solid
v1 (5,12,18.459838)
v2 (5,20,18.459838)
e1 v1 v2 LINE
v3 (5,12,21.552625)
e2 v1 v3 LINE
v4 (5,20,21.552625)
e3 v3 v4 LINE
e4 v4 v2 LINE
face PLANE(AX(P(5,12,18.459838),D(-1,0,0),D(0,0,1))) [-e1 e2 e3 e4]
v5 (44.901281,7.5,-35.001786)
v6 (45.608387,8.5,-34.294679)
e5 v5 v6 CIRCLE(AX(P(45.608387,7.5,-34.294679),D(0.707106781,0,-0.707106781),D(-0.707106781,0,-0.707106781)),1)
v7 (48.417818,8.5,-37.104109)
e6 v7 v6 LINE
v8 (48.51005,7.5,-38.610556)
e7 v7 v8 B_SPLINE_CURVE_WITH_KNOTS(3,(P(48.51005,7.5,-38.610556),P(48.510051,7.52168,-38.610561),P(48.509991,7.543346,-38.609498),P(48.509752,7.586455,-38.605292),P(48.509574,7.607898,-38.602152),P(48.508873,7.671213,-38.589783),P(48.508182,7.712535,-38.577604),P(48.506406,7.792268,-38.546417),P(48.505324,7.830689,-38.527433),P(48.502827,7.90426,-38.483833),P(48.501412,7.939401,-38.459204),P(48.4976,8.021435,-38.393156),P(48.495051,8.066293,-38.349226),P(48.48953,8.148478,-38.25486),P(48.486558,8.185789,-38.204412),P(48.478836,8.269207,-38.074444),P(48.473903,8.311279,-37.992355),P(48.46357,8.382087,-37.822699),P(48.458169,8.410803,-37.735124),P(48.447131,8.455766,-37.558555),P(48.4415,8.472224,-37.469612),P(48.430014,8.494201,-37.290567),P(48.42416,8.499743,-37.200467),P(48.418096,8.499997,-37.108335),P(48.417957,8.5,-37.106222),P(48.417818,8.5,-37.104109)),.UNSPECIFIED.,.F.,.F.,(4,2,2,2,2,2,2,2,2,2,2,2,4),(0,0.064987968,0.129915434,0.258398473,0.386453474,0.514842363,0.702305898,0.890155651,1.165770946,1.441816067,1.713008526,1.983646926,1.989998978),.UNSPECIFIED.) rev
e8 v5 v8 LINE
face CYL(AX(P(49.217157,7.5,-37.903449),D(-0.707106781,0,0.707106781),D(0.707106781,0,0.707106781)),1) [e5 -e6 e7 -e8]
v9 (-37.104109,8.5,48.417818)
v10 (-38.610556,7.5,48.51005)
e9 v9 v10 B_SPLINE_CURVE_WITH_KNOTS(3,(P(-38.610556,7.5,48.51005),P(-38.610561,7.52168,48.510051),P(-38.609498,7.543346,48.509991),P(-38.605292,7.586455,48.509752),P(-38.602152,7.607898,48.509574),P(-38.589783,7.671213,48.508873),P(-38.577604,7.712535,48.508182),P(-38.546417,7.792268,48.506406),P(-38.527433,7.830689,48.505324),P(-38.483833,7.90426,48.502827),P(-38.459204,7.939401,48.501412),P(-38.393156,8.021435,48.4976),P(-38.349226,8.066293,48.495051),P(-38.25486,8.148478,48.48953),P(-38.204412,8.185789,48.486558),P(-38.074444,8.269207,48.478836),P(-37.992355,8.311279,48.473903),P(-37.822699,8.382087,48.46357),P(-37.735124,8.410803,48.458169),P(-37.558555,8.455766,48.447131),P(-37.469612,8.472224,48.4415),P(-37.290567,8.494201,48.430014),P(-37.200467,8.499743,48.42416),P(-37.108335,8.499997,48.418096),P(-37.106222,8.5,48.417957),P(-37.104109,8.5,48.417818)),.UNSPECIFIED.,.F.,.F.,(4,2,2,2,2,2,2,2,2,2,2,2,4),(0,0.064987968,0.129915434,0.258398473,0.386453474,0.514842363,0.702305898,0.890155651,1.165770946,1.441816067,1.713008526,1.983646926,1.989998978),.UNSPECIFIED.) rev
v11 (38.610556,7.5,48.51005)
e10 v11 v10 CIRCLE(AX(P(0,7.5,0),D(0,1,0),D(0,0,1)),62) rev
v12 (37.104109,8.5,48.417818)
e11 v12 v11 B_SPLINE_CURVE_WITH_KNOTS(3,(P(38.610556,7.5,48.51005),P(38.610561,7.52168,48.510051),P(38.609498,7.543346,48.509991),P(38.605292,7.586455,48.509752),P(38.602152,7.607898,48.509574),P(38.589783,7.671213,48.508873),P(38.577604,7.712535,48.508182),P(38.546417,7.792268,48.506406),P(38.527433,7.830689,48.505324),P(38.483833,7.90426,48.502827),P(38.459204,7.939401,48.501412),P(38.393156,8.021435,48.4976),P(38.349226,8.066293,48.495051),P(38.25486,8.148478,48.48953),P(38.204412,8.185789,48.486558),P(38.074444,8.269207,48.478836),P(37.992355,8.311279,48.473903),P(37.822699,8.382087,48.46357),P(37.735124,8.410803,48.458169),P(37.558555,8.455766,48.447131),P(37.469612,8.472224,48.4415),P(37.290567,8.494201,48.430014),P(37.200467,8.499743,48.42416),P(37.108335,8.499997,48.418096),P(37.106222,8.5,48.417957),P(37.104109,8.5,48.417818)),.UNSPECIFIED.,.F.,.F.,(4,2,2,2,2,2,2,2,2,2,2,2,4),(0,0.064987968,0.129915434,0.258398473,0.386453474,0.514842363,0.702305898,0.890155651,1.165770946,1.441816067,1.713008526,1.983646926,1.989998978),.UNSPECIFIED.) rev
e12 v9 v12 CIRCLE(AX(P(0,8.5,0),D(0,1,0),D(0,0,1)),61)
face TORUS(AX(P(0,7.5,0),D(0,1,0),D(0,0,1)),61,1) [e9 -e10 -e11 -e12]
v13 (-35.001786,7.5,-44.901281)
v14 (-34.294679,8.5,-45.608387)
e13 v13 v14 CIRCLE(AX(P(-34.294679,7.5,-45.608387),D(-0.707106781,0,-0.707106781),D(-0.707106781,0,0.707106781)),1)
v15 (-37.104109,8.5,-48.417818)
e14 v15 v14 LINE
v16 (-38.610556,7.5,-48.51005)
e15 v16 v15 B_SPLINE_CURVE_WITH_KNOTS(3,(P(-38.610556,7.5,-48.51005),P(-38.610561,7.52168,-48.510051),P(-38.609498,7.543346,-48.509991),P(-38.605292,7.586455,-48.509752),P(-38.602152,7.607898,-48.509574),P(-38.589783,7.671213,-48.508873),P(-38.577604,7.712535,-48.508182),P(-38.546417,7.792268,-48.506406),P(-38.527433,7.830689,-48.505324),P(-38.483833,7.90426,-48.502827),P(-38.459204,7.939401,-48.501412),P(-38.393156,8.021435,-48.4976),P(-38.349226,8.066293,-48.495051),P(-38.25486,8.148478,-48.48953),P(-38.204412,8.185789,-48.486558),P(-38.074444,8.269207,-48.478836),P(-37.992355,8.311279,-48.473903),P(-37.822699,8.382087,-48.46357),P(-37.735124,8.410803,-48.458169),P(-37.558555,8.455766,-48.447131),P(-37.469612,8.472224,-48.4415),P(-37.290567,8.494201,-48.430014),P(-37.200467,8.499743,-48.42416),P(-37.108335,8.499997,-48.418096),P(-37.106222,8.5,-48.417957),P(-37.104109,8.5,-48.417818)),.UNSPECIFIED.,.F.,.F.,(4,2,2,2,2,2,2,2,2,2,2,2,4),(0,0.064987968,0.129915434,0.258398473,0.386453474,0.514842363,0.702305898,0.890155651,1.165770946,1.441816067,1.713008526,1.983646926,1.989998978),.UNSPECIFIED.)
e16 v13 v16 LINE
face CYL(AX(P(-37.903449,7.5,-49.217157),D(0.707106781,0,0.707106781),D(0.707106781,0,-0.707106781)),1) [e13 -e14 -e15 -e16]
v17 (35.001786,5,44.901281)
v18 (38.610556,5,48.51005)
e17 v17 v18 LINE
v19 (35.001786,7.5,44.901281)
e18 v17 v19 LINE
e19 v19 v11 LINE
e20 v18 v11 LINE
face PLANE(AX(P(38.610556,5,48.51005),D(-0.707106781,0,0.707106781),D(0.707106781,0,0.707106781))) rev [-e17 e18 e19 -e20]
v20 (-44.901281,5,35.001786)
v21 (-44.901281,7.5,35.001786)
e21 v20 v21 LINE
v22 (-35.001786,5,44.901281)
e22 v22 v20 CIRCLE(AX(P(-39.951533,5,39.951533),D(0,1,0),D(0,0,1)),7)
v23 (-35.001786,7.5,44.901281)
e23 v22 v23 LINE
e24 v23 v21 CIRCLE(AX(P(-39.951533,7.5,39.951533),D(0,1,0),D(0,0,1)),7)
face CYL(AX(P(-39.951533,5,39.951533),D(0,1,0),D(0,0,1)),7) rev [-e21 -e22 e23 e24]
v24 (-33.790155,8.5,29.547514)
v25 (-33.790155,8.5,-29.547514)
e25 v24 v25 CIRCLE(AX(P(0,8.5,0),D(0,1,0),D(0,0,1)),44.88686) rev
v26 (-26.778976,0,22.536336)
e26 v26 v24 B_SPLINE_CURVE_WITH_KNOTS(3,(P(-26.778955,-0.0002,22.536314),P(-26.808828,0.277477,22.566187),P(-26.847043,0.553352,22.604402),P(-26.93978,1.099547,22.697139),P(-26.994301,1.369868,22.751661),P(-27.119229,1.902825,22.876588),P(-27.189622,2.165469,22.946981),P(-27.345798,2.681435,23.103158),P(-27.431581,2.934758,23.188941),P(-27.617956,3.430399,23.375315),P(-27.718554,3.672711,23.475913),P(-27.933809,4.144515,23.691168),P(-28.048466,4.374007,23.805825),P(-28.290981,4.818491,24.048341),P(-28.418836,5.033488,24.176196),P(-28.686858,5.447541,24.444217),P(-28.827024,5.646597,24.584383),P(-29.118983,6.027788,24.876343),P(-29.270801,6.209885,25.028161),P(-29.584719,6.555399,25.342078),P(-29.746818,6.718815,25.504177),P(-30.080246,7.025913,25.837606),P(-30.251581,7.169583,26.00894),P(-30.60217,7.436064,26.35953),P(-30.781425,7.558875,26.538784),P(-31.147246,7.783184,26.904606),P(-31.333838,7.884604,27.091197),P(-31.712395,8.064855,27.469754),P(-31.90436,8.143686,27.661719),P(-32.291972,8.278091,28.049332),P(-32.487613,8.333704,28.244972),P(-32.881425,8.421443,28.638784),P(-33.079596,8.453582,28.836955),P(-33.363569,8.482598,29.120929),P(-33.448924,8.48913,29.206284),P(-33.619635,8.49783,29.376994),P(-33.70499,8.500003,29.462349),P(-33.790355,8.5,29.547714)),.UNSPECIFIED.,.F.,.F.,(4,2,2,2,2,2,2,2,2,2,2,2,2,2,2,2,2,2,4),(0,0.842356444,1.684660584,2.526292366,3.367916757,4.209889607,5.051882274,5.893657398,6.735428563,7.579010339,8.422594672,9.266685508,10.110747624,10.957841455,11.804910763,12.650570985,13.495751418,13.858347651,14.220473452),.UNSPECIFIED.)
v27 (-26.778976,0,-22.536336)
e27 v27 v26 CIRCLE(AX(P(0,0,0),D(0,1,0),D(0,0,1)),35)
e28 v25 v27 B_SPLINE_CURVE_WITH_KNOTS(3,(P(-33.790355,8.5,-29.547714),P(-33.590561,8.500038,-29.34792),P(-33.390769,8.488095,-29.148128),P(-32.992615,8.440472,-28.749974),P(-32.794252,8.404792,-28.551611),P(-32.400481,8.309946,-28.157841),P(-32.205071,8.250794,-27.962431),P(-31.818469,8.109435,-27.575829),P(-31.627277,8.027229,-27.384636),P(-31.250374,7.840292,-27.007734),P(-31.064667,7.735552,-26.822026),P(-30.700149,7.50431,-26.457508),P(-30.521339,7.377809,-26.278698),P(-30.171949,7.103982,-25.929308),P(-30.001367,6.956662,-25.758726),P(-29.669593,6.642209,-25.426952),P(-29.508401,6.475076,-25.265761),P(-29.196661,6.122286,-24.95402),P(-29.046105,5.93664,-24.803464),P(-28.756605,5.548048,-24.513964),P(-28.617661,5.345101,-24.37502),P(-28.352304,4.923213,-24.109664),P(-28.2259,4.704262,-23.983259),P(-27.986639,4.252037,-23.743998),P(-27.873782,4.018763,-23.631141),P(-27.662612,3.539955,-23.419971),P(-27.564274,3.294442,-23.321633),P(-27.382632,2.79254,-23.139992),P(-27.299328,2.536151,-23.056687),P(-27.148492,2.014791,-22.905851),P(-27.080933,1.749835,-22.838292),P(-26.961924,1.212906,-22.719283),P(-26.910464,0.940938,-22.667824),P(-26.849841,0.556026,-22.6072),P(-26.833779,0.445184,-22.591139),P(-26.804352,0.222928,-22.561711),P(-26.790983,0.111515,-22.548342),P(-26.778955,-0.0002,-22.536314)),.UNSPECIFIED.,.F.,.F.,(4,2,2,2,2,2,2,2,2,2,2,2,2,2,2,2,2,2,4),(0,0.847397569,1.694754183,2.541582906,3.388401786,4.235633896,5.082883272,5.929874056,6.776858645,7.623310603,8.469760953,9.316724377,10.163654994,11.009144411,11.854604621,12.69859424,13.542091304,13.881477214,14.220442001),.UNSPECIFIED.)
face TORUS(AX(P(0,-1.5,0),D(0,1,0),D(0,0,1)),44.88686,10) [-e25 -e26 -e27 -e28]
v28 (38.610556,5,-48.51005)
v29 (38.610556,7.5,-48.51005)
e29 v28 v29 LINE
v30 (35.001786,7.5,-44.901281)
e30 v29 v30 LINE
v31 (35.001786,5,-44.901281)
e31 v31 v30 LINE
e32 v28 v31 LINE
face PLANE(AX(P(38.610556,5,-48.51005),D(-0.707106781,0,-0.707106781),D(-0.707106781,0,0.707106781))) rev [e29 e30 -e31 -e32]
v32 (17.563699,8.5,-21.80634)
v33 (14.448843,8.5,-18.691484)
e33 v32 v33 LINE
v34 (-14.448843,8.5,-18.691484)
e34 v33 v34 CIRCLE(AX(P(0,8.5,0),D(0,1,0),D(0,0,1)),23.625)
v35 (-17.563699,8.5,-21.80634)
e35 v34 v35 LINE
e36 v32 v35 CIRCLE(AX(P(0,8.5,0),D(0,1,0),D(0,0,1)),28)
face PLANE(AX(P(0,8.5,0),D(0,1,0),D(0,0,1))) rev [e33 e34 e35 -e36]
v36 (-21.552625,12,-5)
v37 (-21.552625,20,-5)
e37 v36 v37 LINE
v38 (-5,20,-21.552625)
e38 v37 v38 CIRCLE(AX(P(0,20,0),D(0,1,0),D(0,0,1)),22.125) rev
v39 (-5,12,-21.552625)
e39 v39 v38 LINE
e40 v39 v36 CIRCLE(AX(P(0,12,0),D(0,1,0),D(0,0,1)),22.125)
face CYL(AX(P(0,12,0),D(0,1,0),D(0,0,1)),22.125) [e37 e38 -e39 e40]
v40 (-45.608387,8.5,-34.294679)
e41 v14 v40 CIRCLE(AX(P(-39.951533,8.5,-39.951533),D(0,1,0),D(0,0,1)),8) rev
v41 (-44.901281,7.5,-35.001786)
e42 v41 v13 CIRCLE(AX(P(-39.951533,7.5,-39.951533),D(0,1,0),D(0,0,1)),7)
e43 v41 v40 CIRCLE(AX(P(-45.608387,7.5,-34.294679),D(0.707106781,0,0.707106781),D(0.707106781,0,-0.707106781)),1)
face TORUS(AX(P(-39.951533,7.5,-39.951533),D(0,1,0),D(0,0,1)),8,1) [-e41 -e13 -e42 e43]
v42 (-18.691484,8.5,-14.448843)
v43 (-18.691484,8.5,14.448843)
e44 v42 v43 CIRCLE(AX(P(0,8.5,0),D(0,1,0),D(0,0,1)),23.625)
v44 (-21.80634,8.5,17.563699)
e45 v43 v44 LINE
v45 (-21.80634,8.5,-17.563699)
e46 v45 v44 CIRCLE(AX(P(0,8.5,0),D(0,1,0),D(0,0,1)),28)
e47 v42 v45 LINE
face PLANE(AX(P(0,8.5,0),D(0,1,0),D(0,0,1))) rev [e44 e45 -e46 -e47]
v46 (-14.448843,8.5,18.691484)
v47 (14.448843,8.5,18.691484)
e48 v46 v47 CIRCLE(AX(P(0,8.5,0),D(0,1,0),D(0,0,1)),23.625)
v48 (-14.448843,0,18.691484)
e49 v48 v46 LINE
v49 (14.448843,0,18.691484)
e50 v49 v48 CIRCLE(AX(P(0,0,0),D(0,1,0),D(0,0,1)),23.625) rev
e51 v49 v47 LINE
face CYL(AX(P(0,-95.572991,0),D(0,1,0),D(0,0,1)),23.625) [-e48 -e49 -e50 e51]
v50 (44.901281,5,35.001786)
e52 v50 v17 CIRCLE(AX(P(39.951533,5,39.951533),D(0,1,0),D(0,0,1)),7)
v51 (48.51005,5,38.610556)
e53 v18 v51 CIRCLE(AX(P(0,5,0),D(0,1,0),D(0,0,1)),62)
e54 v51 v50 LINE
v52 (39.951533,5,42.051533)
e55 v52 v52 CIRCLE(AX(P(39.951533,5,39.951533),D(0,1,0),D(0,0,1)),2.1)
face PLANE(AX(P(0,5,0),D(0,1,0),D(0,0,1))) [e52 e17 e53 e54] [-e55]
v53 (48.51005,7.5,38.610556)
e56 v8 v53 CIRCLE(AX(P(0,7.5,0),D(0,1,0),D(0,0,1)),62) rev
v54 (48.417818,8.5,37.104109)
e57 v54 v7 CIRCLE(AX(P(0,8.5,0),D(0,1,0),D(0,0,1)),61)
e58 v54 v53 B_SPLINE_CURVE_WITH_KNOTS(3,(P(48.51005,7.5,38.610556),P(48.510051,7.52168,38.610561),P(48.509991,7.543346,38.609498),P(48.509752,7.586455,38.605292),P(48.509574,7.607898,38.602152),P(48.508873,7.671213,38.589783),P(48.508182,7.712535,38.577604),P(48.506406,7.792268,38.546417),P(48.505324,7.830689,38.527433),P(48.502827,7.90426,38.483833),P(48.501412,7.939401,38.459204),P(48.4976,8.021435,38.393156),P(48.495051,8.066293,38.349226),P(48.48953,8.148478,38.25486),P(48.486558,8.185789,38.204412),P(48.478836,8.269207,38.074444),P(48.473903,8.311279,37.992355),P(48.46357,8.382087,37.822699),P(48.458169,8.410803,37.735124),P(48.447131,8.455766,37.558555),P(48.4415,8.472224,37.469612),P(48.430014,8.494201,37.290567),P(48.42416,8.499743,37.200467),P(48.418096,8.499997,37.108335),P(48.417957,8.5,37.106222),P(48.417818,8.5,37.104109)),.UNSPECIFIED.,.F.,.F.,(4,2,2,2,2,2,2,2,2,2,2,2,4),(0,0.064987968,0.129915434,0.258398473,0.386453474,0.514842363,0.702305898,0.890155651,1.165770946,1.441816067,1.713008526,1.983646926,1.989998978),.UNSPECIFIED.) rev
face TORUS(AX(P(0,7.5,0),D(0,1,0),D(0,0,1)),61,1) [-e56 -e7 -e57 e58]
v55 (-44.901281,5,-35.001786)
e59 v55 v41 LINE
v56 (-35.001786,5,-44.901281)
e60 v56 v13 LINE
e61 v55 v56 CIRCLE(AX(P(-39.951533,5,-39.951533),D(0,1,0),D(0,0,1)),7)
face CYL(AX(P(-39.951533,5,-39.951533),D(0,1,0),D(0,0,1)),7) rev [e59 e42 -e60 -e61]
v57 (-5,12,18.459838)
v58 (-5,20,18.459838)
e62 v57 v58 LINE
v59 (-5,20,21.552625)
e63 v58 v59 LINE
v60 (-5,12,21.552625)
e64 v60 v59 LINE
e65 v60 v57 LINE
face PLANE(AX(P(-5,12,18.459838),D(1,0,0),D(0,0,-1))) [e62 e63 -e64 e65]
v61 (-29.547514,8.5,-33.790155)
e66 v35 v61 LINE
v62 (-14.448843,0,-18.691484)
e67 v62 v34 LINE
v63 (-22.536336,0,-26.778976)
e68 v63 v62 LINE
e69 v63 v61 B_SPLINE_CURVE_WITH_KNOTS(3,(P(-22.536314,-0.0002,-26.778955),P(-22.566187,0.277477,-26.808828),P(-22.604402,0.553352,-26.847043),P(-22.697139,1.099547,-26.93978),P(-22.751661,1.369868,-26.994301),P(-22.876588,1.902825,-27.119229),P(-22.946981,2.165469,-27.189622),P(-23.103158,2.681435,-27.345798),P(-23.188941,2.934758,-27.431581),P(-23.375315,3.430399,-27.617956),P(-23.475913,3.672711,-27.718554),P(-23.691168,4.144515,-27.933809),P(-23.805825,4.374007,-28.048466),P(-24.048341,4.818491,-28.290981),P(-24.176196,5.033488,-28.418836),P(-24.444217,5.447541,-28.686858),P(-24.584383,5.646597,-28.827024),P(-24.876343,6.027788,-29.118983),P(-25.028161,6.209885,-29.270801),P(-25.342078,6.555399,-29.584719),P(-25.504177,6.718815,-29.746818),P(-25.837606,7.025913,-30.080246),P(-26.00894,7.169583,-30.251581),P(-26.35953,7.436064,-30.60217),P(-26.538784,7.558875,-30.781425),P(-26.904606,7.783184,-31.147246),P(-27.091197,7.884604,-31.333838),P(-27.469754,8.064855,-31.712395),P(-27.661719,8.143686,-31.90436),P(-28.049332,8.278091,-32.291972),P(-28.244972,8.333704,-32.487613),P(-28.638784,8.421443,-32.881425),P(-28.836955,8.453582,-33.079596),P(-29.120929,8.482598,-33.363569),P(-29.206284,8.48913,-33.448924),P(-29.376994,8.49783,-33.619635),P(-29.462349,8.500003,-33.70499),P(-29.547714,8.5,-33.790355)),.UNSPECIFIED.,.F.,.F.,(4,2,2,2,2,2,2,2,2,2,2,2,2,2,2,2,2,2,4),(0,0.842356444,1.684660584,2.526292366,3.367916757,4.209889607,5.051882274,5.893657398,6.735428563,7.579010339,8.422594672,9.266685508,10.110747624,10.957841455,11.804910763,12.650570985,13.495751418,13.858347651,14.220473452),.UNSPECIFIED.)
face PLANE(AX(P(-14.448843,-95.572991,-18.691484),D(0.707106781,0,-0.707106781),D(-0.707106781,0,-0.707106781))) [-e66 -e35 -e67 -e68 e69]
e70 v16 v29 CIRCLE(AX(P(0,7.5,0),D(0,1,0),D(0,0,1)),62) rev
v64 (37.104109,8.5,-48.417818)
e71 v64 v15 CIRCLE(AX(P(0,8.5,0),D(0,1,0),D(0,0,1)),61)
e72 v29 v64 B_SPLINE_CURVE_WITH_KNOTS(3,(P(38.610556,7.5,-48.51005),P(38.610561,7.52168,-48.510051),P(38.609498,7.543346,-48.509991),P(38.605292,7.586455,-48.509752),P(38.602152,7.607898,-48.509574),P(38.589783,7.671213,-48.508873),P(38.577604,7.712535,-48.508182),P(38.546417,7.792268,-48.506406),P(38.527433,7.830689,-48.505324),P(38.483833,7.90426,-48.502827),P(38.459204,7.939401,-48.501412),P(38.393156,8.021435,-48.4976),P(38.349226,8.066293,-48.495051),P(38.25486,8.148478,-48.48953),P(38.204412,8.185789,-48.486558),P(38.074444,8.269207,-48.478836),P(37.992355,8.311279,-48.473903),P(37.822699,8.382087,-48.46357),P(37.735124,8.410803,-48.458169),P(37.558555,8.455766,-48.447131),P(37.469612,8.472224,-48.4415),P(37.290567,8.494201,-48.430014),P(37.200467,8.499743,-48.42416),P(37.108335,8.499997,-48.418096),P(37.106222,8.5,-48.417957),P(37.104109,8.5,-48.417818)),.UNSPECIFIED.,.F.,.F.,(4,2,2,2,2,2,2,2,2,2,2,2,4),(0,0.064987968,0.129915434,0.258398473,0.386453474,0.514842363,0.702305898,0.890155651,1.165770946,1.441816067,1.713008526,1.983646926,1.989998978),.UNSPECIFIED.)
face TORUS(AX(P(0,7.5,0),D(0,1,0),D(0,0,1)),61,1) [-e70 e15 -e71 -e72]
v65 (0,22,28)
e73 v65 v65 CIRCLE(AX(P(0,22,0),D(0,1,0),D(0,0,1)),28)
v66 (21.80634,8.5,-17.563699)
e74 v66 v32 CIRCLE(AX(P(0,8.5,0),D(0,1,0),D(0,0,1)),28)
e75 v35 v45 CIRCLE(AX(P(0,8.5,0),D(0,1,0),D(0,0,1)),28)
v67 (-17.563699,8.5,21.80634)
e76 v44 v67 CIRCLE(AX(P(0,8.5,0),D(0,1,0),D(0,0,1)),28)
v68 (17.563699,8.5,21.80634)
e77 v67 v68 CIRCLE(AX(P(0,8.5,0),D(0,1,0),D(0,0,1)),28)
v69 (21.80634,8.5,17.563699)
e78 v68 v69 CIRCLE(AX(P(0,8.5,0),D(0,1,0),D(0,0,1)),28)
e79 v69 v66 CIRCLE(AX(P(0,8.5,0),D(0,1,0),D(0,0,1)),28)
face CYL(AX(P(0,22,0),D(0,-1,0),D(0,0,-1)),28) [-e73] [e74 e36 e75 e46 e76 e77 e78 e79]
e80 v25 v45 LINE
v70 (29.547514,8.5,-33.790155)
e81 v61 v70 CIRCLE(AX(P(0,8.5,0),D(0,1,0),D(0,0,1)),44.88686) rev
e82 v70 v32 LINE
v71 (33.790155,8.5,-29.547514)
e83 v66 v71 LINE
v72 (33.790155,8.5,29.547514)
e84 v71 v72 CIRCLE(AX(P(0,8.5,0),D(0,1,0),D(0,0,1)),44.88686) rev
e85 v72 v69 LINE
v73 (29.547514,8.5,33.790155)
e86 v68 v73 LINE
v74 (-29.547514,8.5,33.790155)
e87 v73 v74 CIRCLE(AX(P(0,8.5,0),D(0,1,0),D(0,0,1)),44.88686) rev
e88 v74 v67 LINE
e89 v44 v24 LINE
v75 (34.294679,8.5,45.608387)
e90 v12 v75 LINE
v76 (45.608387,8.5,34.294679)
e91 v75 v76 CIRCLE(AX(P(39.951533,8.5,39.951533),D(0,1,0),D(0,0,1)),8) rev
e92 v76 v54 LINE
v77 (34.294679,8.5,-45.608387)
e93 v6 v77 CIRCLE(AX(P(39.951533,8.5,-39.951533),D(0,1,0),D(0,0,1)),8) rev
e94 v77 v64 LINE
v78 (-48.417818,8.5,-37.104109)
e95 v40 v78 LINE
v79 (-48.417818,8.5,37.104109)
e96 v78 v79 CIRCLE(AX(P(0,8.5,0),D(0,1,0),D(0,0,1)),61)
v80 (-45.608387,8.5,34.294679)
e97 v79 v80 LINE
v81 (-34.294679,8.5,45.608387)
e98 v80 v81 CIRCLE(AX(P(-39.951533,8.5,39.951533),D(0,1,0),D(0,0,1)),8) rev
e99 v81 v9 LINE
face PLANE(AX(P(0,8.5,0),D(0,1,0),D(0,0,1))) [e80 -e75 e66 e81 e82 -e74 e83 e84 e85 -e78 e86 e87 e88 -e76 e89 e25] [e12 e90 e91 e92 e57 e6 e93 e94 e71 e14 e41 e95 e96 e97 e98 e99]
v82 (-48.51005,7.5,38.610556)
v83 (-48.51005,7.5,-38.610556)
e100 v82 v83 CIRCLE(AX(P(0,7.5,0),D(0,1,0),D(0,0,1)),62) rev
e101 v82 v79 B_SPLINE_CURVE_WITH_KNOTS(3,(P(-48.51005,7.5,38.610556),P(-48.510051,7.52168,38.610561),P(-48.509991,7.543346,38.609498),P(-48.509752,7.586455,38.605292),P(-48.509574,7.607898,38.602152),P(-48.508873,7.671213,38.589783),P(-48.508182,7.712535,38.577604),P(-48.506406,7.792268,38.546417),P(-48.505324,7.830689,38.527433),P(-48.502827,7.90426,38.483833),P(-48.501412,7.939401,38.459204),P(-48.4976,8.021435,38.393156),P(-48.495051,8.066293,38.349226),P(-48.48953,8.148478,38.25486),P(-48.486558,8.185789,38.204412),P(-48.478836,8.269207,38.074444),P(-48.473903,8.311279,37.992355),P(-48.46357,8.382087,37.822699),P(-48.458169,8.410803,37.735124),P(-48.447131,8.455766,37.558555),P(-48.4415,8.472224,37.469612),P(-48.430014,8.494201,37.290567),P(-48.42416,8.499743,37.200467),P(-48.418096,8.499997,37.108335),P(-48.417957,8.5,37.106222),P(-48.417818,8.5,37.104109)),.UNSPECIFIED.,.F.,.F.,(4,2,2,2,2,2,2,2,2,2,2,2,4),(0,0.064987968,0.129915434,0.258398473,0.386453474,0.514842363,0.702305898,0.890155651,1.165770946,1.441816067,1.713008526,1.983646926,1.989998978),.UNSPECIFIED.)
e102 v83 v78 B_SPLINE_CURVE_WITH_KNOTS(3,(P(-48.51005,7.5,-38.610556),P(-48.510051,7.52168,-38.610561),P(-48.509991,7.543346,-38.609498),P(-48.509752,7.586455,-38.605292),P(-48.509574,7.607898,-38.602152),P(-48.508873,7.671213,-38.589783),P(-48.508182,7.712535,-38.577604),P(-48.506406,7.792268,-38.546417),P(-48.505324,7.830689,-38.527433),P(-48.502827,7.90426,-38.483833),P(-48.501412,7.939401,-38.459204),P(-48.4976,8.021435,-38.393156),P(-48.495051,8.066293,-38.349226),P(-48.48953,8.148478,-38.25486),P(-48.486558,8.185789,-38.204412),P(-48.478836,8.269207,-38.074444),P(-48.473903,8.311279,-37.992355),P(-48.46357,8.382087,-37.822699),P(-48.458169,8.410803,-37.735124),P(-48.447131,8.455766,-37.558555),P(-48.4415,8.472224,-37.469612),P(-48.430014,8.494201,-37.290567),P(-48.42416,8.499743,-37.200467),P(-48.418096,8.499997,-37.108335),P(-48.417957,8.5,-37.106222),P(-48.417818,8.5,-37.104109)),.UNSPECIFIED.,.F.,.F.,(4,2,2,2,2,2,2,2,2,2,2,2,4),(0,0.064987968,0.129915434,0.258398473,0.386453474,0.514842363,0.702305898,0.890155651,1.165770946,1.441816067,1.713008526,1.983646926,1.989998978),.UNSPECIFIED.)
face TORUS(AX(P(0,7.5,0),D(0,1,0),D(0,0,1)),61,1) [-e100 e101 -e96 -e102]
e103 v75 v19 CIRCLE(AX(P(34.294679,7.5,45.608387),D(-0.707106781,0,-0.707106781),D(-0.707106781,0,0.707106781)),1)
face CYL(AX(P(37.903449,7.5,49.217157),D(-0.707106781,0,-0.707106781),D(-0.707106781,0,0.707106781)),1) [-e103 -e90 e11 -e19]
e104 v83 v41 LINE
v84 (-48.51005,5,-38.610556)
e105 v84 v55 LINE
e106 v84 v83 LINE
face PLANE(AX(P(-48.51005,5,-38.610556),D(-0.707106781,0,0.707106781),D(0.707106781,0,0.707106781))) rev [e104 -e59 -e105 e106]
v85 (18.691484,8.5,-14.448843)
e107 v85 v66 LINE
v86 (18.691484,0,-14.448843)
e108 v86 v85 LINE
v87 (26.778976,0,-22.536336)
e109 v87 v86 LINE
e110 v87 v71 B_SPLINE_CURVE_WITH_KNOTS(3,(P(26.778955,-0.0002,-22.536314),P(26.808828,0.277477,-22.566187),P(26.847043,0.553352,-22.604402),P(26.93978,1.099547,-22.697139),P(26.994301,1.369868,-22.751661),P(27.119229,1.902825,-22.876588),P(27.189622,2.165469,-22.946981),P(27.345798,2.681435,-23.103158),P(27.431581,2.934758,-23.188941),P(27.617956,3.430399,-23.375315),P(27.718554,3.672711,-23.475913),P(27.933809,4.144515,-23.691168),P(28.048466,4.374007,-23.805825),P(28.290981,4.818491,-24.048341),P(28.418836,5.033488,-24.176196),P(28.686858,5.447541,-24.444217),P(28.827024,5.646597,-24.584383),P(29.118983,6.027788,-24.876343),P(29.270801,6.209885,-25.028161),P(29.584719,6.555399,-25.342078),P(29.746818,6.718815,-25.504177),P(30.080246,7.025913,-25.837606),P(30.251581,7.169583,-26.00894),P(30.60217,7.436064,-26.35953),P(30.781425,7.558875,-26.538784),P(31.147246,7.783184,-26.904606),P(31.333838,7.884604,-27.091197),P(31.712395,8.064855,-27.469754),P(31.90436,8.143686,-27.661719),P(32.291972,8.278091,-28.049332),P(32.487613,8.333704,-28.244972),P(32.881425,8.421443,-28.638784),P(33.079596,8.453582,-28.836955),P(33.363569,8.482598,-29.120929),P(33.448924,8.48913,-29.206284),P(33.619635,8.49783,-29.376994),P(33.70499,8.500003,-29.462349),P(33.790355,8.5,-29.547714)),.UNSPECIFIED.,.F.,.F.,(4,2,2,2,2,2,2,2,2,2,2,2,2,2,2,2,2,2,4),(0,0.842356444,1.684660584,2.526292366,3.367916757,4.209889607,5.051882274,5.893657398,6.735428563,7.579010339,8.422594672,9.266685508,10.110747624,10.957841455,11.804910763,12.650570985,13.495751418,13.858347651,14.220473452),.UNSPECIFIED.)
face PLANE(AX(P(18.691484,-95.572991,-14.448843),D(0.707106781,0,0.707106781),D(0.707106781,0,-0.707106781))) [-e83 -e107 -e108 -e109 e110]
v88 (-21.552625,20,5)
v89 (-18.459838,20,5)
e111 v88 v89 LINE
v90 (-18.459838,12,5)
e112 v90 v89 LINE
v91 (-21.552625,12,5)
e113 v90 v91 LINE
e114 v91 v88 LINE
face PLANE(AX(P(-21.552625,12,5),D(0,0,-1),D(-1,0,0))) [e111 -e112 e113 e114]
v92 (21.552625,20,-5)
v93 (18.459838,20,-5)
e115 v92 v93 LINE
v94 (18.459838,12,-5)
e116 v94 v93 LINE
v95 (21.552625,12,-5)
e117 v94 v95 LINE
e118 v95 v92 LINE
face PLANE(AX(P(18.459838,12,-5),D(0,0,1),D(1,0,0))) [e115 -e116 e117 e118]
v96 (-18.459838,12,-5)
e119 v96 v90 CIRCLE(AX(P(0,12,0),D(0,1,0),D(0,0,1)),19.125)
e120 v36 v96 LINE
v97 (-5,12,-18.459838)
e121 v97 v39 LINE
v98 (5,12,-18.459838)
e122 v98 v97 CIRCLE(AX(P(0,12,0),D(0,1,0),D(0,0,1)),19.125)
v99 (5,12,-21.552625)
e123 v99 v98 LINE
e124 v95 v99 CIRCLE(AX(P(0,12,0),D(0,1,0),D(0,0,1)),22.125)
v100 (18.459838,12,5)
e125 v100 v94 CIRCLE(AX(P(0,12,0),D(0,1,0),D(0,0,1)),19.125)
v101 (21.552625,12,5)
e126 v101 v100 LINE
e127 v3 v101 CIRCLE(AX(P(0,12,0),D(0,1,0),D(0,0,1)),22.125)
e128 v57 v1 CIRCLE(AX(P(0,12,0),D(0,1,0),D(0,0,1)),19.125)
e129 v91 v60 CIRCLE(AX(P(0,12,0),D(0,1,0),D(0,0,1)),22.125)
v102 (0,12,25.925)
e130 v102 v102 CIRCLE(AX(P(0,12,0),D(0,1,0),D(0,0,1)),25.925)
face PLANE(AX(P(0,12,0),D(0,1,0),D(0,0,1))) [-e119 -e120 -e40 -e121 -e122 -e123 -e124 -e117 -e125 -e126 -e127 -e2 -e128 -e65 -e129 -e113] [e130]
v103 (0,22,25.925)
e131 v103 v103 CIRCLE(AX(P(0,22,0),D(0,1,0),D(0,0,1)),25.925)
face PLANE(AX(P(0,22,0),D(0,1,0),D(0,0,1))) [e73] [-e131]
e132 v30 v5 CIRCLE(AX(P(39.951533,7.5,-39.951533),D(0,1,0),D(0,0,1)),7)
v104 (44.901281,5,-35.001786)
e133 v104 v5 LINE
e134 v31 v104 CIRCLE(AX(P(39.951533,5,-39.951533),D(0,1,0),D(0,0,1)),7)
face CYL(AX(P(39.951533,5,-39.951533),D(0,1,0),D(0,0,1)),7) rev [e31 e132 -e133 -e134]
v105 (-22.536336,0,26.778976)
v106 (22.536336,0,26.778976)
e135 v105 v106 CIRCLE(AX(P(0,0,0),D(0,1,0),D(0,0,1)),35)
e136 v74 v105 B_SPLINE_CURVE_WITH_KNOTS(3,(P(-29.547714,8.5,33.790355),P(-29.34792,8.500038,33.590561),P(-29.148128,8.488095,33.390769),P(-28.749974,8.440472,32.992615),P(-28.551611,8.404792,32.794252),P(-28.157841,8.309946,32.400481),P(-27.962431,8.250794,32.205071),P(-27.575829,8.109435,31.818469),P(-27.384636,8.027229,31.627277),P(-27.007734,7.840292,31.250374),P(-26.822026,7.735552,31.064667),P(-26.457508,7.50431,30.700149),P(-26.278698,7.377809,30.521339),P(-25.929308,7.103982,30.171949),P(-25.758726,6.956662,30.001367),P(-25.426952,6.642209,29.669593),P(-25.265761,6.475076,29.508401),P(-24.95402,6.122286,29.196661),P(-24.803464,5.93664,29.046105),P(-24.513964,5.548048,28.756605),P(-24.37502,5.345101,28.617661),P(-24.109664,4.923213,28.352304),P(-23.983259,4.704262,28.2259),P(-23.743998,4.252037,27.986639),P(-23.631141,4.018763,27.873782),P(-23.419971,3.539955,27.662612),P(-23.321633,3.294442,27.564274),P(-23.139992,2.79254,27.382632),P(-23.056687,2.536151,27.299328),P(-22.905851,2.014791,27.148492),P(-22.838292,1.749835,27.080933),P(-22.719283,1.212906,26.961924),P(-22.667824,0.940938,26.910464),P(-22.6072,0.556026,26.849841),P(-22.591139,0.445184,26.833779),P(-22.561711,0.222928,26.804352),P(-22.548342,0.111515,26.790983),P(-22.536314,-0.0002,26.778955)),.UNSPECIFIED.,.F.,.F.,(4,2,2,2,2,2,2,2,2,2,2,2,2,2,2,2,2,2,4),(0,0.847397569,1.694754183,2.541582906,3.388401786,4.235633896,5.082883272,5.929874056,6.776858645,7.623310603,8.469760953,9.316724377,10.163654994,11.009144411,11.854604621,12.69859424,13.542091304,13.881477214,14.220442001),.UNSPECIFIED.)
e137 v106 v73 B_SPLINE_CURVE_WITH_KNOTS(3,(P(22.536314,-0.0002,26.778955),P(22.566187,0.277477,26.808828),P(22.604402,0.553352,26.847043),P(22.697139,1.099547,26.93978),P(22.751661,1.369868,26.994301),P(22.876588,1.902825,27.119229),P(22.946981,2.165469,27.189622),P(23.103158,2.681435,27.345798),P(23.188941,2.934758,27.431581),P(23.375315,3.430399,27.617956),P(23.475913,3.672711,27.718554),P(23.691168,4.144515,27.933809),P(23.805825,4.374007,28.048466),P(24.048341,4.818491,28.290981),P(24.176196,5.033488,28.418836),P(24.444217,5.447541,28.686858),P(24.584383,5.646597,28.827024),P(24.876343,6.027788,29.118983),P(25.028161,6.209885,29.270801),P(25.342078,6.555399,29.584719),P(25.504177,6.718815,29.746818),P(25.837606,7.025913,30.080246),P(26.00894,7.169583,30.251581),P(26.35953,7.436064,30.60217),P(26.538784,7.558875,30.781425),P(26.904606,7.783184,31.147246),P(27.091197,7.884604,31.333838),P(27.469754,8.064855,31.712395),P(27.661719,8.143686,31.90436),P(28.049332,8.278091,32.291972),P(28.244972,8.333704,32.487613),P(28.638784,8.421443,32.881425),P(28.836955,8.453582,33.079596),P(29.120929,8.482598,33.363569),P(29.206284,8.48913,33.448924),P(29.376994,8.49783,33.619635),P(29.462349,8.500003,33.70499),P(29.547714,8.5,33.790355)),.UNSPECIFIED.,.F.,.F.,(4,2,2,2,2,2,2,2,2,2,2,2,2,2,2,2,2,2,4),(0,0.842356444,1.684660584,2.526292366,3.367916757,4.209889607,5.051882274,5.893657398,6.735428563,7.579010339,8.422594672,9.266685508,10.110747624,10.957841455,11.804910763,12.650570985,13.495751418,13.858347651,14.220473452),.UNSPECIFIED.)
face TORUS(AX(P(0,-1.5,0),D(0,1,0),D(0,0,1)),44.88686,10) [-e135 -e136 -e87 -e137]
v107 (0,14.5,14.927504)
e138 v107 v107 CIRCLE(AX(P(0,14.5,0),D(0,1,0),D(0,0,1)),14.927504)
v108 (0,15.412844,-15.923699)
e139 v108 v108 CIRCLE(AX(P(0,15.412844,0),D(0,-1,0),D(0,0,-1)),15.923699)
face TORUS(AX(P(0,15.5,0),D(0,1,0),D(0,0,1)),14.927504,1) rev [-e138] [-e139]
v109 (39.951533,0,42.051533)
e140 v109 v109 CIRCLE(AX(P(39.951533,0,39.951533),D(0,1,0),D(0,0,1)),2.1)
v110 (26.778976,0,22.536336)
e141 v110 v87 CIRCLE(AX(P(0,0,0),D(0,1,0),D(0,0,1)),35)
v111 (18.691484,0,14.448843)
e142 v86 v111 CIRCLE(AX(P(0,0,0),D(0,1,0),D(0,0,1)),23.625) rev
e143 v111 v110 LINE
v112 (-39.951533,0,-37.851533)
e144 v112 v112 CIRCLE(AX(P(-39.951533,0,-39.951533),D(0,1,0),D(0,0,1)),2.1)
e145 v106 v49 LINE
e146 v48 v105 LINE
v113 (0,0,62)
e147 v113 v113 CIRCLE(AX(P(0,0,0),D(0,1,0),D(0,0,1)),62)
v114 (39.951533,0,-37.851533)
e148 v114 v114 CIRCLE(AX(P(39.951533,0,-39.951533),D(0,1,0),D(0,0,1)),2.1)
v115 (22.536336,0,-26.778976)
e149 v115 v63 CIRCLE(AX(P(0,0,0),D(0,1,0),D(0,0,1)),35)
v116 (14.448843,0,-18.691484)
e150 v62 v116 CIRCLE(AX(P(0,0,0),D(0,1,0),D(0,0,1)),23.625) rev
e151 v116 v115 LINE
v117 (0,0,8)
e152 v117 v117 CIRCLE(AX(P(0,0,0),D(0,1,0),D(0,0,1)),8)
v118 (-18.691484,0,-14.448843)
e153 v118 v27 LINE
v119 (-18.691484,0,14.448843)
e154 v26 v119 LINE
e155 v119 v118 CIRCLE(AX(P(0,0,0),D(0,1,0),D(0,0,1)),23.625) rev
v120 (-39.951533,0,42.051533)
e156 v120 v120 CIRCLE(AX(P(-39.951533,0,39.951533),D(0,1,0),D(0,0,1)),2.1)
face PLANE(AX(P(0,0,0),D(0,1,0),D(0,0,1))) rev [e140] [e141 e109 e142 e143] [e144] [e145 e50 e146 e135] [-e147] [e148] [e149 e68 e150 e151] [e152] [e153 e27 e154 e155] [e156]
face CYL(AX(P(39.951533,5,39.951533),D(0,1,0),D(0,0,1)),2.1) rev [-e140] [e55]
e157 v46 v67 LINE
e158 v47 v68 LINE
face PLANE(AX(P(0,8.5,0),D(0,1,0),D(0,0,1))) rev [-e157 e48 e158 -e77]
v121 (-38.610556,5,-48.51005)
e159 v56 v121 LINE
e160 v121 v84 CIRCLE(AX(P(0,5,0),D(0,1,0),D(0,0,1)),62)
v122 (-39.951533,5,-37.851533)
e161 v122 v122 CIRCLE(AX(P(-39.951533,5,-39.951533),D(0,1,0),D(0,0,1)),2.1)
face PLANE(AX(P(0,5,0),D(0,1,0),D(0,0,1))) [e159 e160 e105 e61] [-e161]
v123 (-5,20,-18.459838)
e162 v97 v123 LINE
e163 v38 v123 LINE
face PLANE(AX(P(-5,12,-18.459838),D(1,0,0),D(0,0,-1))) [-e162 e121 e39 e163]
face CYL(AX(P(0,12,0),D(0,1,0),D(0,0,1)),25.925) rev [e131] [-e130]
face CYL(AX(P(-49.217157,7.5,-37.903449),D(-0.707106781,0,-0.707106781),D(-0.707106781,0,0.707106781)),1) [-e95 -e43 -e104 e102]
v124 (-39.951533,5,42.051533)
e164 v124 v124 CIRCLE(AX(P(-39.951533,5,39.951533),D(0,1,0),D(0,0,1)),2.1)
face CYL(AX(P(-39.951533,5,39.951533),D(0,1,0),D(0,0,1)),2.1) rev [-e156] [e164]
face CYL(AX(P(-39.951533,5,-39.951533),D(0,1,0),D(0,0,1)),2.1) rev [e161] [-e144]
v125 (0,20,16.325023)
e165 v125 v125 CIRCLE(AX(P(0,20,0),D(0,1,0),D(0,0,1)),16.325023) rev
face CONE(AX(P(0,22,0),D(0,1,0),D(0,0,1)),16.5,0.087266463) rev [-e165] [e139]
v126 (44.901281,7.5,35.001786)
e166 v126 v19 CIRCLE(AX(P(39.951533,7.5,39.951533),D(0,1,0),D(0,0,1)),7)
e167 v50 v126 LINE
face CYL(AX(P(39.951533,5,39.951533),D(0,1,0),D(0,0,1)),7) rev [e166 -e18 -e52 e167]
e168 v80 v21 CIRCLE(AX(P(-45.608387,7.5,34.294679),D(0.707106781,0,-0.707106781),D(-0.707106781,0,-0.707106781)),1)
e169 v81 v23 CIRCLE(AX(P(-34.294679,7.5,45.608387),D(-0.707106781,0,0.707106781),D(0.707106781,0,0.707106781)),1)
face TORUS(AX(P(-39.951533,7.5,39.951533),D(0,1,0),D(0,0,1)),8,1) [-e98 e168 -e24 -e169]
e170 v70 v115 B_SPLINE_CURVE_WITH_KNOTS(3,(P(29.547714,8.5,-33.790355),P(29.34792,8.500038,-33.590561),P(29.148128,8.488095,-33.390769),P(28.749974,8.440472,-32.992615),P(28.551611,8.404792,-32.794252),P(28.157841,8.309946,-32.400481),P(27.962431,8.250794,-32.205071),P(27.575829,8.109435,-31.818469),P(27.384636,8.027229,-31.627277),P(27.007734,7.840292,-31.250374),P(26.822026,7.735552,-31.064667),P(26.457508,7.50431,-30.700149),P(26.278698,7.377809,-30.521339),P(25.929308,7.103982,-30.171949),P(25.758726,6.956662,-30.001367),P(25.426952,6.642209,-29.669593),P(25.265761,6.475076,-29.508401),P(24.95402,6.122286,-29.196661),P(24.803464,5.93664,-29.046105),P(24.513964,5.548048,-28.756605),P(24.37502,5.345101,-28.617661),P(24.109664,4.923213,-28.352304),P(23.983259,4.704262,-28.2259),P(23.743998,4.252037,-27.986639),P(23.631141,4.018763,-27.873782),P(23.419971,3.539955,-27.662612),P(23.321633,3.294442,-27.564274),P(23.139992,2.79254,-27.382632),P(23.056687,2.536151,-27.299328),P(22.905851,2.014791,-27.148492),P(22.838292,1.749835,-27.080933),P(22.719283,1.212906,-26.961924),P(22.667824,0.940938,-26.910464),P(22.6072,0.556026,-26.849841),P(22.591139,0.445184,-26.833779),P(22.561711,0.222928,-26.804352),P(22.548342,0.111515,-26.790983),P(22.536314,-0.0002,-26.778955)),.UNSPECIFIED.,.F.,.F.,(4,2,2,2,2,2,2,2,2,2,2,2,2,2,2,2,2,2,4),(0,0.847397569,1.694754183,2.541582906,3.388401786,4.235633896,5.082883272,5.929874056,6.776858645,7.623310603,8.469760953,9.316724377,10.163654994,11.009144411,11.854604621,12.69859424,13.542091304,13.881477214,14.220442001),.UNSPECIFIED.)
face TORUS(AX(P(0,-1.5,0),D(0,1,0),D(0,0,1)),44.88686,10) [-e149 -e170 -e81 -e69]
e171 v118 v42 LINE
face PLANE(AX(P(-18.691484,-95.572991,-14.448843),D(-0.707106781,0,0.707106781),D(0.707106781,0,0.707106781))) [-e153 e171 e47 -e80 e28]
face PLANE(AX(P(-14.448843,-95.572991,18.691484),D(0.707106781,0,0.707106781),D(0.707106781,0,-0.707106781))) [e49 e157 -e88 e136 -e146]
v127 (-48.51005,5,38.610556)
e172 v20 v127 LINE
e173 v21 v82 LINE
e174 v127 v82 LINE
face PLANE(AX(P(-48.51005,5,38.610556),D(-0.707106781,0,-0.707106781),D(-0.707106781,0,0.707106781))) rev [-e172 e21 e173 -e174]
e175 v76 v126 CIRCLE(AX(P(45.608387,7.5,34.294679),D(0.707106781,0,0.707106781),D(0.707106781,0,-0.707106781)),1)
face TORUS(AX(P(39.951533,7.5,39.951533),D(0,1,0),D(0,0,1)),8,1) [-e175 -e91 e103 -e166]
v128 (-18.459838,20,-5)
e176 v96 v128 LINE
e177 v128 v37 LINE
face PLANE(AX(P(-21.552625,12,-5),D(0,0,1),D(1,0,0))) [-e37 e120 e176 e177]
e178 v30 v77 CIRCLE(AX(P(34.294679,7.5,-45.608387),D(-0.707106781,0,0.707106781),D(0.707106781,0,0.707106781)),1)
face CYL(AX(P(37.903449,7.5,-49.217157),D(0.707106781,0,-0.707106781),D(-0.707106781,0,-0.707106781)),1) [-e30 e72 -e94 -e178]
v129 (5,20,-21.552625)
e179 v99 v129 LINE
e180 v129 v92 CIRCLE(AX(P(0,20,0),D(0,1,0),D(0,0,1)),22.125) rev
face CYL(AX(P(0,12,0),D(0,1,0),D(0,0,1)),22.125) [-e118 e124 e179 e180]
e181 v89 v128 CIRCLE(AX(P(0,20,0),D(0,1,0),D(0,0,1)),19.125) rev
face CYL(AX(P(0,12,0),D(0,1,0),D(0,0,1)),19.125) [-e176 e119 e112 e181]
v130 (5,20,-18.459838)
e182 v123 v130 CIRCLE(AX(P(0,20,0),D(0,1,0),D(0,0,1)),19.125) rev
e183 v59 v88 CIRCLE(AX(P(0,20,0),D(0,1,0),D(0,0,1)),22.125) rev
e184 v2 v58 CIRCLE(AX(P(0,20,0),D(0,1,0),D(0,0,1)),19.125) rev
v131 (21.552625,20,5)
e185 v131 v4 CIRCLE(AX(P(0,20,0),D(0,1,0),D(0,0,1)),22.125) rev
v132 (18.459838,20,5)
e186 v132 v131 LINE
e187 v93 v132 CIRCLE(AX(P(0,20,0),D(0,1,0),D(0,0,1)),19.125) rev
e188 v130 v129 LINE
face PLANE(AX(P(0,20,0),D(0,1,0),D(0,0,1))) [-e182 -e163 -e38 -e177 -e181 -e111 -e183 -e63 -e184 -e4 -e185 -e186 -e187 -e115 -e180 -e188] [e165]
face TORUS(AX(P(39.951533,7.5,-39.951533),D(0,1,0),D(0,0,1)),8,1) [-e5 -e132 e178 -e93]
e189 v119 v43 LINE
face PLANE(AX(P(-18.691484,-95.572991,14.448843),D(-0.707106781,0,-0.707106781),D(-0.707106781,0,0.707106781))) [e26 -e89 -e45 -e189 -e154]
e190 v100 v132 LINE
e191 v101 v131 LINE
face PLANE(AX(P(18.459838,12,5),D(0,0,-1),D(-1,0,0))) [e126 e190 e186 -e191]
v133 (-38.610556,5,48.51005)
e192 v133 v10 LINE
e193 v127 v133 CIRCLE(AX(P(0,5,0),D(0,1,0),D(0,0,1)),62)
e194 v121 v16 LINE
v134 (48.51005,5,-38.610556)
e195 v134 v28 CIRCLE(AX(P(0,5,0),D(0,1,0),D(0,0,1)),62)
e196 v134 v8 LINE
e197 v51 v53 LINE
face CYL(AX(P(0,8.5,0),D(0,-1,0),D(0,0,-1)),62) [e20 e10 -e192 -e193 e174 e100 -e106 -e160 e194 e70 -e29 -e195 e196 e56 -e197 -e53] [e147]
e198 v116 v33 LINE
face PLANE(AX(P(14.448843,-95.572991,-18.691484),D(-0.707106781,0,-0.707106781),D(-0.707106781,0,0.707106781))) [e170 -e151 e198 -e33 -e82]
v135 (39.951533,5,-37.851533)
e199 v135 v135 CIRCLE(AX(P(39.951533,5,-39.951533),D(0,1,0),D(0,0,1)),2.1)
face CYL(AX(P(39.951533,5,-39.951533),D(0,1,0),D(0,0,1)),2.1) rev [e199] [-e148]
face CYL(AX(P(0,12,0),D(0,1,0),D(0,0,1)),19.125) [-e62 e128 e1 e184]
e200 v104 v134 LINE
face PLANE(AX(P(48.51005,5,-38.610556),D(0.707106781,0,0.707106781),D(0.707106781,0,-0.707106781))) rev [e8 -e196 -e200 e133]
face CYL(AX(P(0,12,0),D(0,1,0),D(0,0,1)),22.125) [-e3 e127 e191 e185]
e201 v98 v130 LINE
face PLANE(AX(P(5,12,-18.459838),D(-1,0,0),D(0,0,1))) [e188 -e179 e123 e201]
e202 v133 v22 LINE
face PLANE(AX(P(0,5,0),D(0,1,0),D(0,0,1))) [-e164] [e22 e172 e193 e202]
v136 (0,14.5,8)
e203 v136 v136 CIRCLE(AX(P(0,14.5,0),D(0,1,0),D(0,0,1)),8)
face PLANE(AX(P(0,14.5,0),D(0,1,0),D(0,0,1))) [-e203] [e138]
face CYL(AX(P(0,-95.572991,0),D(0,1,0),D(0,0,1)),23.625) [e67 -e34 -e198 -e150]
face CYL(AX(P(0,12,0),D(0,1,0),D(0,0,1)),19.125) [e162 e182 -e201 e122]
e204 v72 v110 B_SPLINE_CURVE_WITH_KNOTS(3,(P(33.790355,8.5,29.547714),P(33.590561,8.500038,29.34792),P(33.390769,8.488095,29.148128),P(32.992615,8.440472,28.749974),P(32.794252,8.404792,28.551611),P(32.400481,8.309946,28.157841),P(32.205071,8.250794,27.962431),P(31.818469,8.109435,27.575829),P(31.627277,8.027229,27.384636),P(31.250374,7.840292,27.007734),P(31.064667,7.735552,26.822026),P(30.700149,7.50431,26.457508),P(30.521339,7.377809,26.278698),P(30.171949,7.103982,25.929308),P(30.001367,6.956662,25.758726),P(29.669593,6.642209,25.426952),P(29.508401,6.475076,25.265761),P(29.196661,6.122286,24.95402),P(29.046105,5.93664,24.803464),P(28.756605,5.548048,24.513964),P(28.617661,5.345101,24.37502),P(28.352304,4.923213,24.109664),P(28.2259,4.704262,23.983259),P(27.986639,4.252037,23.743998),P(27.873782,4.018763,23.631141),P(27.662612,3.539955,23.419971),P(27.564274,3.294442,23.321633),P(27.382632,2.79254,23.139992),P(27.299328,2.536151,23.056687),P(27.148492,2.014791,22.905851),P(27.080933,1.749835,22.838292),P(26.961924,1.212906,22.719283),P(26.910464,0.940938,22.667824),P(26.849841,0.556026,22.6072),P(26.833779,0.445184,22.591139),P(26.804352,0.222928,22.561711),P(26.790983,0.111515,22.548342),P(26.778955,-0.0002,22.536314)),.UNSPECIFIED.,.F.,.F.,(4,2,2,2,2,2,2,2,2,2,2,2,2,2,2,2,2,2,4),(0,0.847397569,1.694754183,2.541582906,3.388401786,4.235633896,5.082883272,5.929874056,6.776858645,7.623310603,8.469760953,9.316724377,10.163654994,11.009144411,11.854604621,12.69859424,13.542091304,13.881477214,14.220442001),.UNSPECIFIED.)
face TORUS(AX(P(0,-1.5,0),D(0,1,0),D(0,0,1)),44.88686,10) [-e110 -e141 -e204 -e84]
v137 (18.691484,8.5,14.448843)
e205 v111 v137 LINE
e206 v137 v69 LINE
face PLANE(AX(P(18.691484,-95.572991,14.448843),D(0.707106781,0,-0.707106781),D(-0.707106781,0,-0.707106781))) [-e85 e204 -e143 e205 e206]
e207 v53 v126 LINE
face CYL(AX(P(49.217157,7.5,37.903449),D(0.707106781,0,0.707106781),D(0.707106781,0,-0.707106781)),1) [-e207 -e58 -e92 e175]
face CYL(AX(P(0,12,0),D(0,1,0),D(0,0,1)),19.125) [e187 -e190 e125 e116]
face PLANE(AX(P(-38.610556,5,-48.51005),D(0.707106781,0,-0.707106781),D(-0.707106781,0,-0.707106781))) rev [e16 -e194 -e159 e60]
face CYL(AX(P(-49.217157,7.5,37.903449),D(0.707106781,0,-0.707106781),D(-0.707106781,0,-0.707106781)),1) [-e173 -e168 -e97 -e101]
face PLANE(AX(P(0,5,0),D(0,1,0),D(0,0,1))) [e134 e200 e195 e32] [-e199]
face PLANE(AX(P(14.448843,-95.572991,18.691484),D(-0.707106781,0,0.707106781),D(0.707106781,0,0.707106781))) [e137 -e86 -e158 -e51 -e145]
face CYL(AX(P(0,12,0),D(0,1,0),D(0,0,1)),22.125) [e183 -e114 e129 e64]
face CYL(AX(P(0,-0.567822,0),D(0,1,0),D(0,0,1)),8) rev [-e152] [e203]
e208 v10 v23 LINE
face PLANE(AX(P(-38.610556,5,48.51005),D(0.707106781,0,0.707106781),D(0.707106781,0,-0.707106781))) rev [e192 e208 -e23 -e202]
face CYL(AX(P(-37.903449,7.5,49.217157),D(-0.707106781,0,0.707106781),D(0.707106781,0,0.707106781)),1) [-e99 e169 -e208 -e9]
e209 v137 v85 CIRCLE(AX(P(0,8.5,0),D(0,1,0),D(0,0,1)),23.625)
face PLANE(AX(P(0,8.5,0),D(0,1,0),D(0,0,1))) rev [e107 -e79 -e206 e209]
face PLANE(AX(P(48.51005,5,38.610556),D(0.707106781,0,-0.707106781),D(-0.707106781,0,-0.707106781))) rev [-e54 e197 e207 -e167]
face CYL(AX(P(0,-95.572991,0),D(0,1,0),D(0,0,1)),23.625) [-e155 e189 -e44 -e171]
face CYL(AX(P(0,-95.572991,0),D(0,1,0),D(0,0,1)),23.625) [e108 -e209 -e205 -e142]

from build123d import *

# Parameters (mm, degrees)
SKETCH_1_R            = 62
SKETCH_1_R_2          = 35
EXTRUDE_1_DEPTH       = 8.5
FILLET_1_R            = 10
EXTRUDE_2_DEPTH       = 8.5
SKETCH_3_R            = 28
EXTRUDE_3_DEPTH       = 13.5
SKETCH_4_R            = 16.5
CUT_EXTRUDE_1_DEPTH   = 7.5
CUT_EXTRUDE_1_DRAFT   = -5
FILLET_2_R            = 1
CHAMFER_1_SIZE        = 1
CHAMFER_1_SIZE2       = 1.100062868
SKETCH_5_R            = 8
CUT_EXTRUDE_2_DEPTH   = 89.872099125
SKETCH_6_R            = 25.925
CUT_EXTRUDE_3_DEPTH   = 10
SKETCH_8_R            = 24
CUT_EXTRUDE_4_DEPTH   = 2
CUT_EXTRUDE_START     = -3.5
CUT_EXTRUDE_5_DEPTH   = 3.5
FILLET_3_R            = 1
HOLE_WIZARD_M51_D     = 4.2
HOLE_WIZARD_M51_DEPTH = 14
HOLE_WIZARD_M51_TIP   = 1.2618073


with BuildPart() as part:
    # Эскиз1 → Бобышка-Вытянуть1 (new body)
    with BuildSketch(Plane(origin=(0, 0, 0), x_dir=(1, 0, 0), z_dir=(0, 1, 0))):
        with Locations(Location((0, 0, 0), (0, 0, 270))):
            Circle(SKETCH_1_R)
        with Locations(Location((0, 0, 0), (0, 0, 270))):
            Circle(SKETCH_1_R_2, mode=Mode.SUBTRACT)
    extrude(amount=EXTRUDE_1_DEPTH)

    # Скругление1
    # the kernel refuses this fillet: 10 mm, written as the material it takes off along each edge
    with BuildSketch(Plane(origin=(0, 8.5, 0), x_dir=(0, 0, 1), z_dir=(-1, 0, 0))) as fillet_1_piece_1:
        with BuildLine():
            CenterArc((44.886859967, -10), FILLET_1_R, 90, 81.373073441)
            Line((44.886859967, 0), (44.886859967, 0.2))
            Line((44.886859967, 0.2), (35, 0.2))
            Line((35, 0.2), (34.8, 0))
            ThreePointArc((34.8, 0), (34.8, -4.25), (34.802262801, -8.47))
            Line((34.802262801, -8.47), (35, -8.5))
        make_face()
    revolve(axis=Axis((0, 8.5, 0), (0, 1, 0)), mode=Mode.SUBTRACT)

    # Эскиз2 → Бобышка-Вытянуть2 (add)
    with BuildSketch(Plane(origin=(0, 8.5, 0), x_dir=(1, 0, 0), z_dir=(0, 1, 0))):
        with BuildLine():
            Line((-14.448842978, 18.691483665), (-29.547514476, 33.790155163))
            ThreePointArc((-29.547514476, 33.790155163), (-31.739803069, 31.739803069), (-33.790155163, 29.547514476))
            Line((-33.790155163, 29.547514476), (-18.691483665, 14.448842978))
            ThreePointArc((-18.691483665, 14.448842978), (-23.625, 0), (-18.691483665, -14.448842978))
            Line((-18.691483665, -14.448842978), (-33.790155163, -29.547514476))
            ThreePointArc((-33.790155163, -29.547514476), (-31.739803069, -31.739803069), (-29.547514476, -33.790155163))
            Line((-29.547514476, -33.790155163), (-14.448842978, -18.691483665))
            ThreePointArc((-14.448842978, -18.691483665), (0, -23.625), (14.448842978, -18.691483665))
            Line((14.448842978, -18.691483665), (29.547514476, -33.790155163))
            ThreePointArc((29.547514476, -33.790155163), (31.739803069, -31.739803069), (33.790155163, -29.547514476))
            Line((33.790155163, -29.547514476), (18.691483665, -14.448842978))
            ThreePointArc((18.691483665, -14.448842978), (23.625, 0), (18.691483665, 14.448842978))
            Line((18.691483665, 14.448842978), (33.790155163, 29.547514476))
            ThreePointArc((33.790155163, 29.547514476), (31.739803069, 31.739803069), (29.547514476, 33.790155163))
            Line((29.547514476, 33.790155163), (14.448842978, 18.691483665))
            ThreePointArc((14.448842978, 18.691483665), (0, 23.625), (-14.448842978, 18.691483665))
        make_face()
    extrude(amount=-EXTRUDE_2_DEPTH)

    # Эскиз3 → Бобышка-Вытянуть3 (add)
    with BuildSketch(Plane(origin=(0, 8.5, 0), x_dir=(1, 0, 0), z_dir=(0, 1, 0))):
        with Locations(Location((0, 0, 0), (0, 0, 51.150639828))):
            Circle(SKETCH_3_R)
    extrude(amount=EXTRUDE_3_DEPTH)


with BuildPart() as cut_extrude_1_tool:
    # Эскиз4 → Вырез-Вытянуть1 (with draft: the straight prism first)
    with BuildSketch(Plane(origin=(0, 22, 0), x_dir=(1, 0, 0), z_dir=(0, 1, 0))):
        Circle(SKETCH_4_R)
    extrude(amount=-CUT_EXTRUDE_1_DEPTH)
    # Вырез-Вытянуть1: the draft: its side faces are tilted about the plane it starts from
    cut_extrude_1_sides = [cut_extrude_1_tool.faces().sort_by_distance(p)[0] for p in [
        (-16.5, 18.25, 0),
    ]]
    draft(cut_extrude_1_sides, Plane(origin=(0, 22, 0), x_dir=(1, 0, 0), z_dir=(0, 1, 0)), CUT_EXTRUDE_1_DRAFT)


with BuildPart() as part_1:
    add(part.part)

    # Вырез-Вытянуть1: cut by cut_extrude_1_tool
    add(cut_extrude_1_tool.part, mode=Mode.SUBTRACT)

    # Скругление2
    fillet_2_edges = [part_1.edges().sort_by_distance(p)[0] for p in [
        (-15.843835024, 14.5, 0),
    ]]
    fillet(fillet_2_edges, radius=FILLET_2_R)

    # Фаска1
    chamfer_1_edges = [part_1.edges().sort_by_distance(p)[0] for p in [
        (-16.5, 22, 0),
    ]]
    chamfer_1_side = [part_1.faces().sort_by_distance(p)[0] for p in [
        (-17.066922905, 22, 21.189563592),
    ]]
    chamfer(chamfer_1_edges, length=CHAMFER_1_SIZE, length2=CHAMFER_1_SIZE2, reference=chamfer_1_side[0])

    # Эскиз5 → Вырез-Вытянуть2 (cut, through all)
    with BuildSketch(Plane(origin=(0, 14.5, 0), x_dir=(1, 0, 0), z_dir=(0, 1, 0))):
        with Locations(Location((0, 0, 0), (0, 0, 270))):
            Circle(SKETCH_5_R)
    extrude(amount=-CUT_EXTRUDE_2_DEPTH, mode=Mode.SUBTRACT)

    # Эскиз6 → Вырез-Вытянуть3 (cut)
    with BuildSketch(Plane(origin=(0, 22, 0), x_dir=(1, 0, 0), z_dir=(0, 1, 0))):
        with Locations(Location((0, 0, 0), (0, 0, 270))):
            Circle(SKETCH_6_R)
        with BuildLine():
            Line((-21.55262455, -5), (-18.459838163, -5))
            ThreePointArc((-18.459838163, -5), (-19.125, 0), (-18.459838163, 5))
            Line((-18.459838163, 5), (-21.55262455, 5))
            ThreePointArc((-21.55262455, 5), (-15.644737534, 15.644737534), (-5, 21.55262455))
            Line((-5, 21.55262455), (-5, 18.459838163))
            ThreePointArc((-5, 18.459838163), (0, 19.125), (5, 18.459838163))
            Line((5, 18.459838163), (5, 21.55262455))
            ThreePointArc((5, 21.55262455), (15.644737534, 15.644737534), (21.55262455, 5))
            Line((21.55262455, 5), (18.459838163, 5))
            ThreePointArc((18.459838163, 5), (19.125, 0), (18.459838163, -5))
            Line((18.459838163, -5), (21.55262455, -5))
            ThreePointArc((21.55262455, -5), (15.644737534, -15.644737534), (5, -21.55262455))
            Line((5, -21.55262455), (5, -18.459838163))
            ThreePointArc((5, -18.459838163), (0, -19.125), (-5, -18.459838163))
            Line((-5, -18.459838163), (-5, -21.55262455))
            ThreePointArc((-5, -21.55262455), (-15.644737534, -15.644737534), (-21.55262455, -5))
        make_face(mode=Mode.SUBTRACT)
    extrude(amount=-CUT_EXTRUDE_3_DEPTH, mode=Mode.SUBTRACT)

    # Эскиз8 → Вырез-Вытянуть4 (cut)
    with BuildSketch(Plane(origin=(0, 22, 0), x_dir=(1, 0, 0), z_dir=(0, 1, 0))):
        Circle(SKETCH_8_R)
    extrude(amount=-CUT_EXTRUDE_4_DEPTH, mode=Mode.SUBTRACT)

    # Эскиз9 → Вырез-Вытянуть5 (cut)
    with BuildSketch(Plane(origin=(0, 8.5, 0), x_dir=(1, 0, 0), z_dir=(0, 1, 0)).offset(CUT_EXTRUDE_START)):
        with BuildLine():
            Line((38.610555561, 48.510050498), (35.001785669, 44.901280605))
            ThreePointArc((35.001785669, 44.901280605), (35.001785669, 35.001785669), (44.901280605, 35.001785669))
            Line((44.901280605, 35.001785669), (48.510050498, 38.610555561))
            ThreePointArc((48.510050498, 38.610555561), (43.840620434, 43.840620434), (38.610555561, 48.510050498))
        make_face()
        with BuildLine():
            Line((-38.610555561, 48.510050498), (-35.001785669, 44.901280605))
            ThreePointArc((-35.001785669, 44.901280605), (-35.001785669, 35.001785669), (-44.901280605, 35.001785669))
            Line((-44.901280605, 35.001785669), (-48.510050498, 38.610555561))
            ThreePointArc((-48.510050498, 38.610555561), (-43.840620434, 43.840620434), (-38.610555561, 48.510050498))
        make_face()
        with BuildLine():
            Line((48.510050498, -38.610555561), (44.901280605, -35.001785669))
            ThreePointArc((44.901280605, -35.001785669), (35.001785669, -35.001785669), (35.001785669, -44.901280605))
            Line((35.001785669, -44.901280605), (38.610555561, -48.510050498))
            ThreePointArc((38.610555561, -48.510050498), (43.840620434, -43.840620434), (48.510050498, -38.610555561))
        make_face()
        with BuildLine():
            Line((-38.610555561, -48.510050498), (-35.001785669, -44.901280605))
            ThreePointArc((-35.001785669, -44.901280605), (-35.001785669, -35.001785669), (-44.901280605, -35.001785669))
            Line((-44.901280605, -35.001785669), (-48.510050498, -38.610555561))
            ThreePointArc((-48.510050498, -38.610555561), (-43.840620434, -43.840620434), (-38.610555561, -48.510050498))
        make_face()
    extrude(amount=CUT_EXTRUDE_5_DEPTH, mode=Mode.SUBTRACT)

    # Скругление3
    fillet_3_edges = [part_1.edges().sort_by_distance(p)[0] for p in [
        (62, 8.5, 0),
        (0, 8.5, -62),
        (-62, 8.5, 0),
        (-20.449656099, 8.5, 58.530432814),
        (-36.806170615, 8.5, 46.705665551),
        (-35.001785669, 8.5, 35.001785669),
        (-46.705665551, 8.5, 36.806170615),
        (46.705665551, 8.5, 36.806170615),
        (35.001785669, 8.5, 35.001785669),
        (36.806170615, 8.5, 46.705665551),
        (36.806170615, 8.5, -46.705665551),
        (35.001785669, 8.5, -35.001785669),
        (46.705665551, 8.5, -36.806170615),
        (-46.705665551, 8.5, -36.806170615),
        (-35.001785669, 8.5, -35.001785669),
        (-36.806170615, 8.5, -46.705665551),
    ]]
    fillet(fillet_3_edges, radius=FILLET_3_R)

    # Отверстие обработанное метчиком M51
    with Locations(Plane(origin=(0, 5, 0), x_dir=(1, 0, 0), z_dir=(0, 1, 0))):
        with Locations((-39.951533137, 39.951533137), (39.951533137, 39.951533137), (39.951533137, -39.951533137), (-39.951533137, -39.951533137)):
            Hole(HOLE_WIZARD_M51_D / 2, depth=HOLE_WIZARD_M51_DEPTH)
            with Locations((0, 0, -(HOLE_WIZARD_M51_DEPTH + HOLE_WIZARD_M51_TIP / 2))):  # 118° drill point
                Cone(0, HOLE_WIZARD_M51_D / 2, HOLE_WIZARD_M51_TIP, mode=Mode.SUBTRACT)


solid = part_1.part
